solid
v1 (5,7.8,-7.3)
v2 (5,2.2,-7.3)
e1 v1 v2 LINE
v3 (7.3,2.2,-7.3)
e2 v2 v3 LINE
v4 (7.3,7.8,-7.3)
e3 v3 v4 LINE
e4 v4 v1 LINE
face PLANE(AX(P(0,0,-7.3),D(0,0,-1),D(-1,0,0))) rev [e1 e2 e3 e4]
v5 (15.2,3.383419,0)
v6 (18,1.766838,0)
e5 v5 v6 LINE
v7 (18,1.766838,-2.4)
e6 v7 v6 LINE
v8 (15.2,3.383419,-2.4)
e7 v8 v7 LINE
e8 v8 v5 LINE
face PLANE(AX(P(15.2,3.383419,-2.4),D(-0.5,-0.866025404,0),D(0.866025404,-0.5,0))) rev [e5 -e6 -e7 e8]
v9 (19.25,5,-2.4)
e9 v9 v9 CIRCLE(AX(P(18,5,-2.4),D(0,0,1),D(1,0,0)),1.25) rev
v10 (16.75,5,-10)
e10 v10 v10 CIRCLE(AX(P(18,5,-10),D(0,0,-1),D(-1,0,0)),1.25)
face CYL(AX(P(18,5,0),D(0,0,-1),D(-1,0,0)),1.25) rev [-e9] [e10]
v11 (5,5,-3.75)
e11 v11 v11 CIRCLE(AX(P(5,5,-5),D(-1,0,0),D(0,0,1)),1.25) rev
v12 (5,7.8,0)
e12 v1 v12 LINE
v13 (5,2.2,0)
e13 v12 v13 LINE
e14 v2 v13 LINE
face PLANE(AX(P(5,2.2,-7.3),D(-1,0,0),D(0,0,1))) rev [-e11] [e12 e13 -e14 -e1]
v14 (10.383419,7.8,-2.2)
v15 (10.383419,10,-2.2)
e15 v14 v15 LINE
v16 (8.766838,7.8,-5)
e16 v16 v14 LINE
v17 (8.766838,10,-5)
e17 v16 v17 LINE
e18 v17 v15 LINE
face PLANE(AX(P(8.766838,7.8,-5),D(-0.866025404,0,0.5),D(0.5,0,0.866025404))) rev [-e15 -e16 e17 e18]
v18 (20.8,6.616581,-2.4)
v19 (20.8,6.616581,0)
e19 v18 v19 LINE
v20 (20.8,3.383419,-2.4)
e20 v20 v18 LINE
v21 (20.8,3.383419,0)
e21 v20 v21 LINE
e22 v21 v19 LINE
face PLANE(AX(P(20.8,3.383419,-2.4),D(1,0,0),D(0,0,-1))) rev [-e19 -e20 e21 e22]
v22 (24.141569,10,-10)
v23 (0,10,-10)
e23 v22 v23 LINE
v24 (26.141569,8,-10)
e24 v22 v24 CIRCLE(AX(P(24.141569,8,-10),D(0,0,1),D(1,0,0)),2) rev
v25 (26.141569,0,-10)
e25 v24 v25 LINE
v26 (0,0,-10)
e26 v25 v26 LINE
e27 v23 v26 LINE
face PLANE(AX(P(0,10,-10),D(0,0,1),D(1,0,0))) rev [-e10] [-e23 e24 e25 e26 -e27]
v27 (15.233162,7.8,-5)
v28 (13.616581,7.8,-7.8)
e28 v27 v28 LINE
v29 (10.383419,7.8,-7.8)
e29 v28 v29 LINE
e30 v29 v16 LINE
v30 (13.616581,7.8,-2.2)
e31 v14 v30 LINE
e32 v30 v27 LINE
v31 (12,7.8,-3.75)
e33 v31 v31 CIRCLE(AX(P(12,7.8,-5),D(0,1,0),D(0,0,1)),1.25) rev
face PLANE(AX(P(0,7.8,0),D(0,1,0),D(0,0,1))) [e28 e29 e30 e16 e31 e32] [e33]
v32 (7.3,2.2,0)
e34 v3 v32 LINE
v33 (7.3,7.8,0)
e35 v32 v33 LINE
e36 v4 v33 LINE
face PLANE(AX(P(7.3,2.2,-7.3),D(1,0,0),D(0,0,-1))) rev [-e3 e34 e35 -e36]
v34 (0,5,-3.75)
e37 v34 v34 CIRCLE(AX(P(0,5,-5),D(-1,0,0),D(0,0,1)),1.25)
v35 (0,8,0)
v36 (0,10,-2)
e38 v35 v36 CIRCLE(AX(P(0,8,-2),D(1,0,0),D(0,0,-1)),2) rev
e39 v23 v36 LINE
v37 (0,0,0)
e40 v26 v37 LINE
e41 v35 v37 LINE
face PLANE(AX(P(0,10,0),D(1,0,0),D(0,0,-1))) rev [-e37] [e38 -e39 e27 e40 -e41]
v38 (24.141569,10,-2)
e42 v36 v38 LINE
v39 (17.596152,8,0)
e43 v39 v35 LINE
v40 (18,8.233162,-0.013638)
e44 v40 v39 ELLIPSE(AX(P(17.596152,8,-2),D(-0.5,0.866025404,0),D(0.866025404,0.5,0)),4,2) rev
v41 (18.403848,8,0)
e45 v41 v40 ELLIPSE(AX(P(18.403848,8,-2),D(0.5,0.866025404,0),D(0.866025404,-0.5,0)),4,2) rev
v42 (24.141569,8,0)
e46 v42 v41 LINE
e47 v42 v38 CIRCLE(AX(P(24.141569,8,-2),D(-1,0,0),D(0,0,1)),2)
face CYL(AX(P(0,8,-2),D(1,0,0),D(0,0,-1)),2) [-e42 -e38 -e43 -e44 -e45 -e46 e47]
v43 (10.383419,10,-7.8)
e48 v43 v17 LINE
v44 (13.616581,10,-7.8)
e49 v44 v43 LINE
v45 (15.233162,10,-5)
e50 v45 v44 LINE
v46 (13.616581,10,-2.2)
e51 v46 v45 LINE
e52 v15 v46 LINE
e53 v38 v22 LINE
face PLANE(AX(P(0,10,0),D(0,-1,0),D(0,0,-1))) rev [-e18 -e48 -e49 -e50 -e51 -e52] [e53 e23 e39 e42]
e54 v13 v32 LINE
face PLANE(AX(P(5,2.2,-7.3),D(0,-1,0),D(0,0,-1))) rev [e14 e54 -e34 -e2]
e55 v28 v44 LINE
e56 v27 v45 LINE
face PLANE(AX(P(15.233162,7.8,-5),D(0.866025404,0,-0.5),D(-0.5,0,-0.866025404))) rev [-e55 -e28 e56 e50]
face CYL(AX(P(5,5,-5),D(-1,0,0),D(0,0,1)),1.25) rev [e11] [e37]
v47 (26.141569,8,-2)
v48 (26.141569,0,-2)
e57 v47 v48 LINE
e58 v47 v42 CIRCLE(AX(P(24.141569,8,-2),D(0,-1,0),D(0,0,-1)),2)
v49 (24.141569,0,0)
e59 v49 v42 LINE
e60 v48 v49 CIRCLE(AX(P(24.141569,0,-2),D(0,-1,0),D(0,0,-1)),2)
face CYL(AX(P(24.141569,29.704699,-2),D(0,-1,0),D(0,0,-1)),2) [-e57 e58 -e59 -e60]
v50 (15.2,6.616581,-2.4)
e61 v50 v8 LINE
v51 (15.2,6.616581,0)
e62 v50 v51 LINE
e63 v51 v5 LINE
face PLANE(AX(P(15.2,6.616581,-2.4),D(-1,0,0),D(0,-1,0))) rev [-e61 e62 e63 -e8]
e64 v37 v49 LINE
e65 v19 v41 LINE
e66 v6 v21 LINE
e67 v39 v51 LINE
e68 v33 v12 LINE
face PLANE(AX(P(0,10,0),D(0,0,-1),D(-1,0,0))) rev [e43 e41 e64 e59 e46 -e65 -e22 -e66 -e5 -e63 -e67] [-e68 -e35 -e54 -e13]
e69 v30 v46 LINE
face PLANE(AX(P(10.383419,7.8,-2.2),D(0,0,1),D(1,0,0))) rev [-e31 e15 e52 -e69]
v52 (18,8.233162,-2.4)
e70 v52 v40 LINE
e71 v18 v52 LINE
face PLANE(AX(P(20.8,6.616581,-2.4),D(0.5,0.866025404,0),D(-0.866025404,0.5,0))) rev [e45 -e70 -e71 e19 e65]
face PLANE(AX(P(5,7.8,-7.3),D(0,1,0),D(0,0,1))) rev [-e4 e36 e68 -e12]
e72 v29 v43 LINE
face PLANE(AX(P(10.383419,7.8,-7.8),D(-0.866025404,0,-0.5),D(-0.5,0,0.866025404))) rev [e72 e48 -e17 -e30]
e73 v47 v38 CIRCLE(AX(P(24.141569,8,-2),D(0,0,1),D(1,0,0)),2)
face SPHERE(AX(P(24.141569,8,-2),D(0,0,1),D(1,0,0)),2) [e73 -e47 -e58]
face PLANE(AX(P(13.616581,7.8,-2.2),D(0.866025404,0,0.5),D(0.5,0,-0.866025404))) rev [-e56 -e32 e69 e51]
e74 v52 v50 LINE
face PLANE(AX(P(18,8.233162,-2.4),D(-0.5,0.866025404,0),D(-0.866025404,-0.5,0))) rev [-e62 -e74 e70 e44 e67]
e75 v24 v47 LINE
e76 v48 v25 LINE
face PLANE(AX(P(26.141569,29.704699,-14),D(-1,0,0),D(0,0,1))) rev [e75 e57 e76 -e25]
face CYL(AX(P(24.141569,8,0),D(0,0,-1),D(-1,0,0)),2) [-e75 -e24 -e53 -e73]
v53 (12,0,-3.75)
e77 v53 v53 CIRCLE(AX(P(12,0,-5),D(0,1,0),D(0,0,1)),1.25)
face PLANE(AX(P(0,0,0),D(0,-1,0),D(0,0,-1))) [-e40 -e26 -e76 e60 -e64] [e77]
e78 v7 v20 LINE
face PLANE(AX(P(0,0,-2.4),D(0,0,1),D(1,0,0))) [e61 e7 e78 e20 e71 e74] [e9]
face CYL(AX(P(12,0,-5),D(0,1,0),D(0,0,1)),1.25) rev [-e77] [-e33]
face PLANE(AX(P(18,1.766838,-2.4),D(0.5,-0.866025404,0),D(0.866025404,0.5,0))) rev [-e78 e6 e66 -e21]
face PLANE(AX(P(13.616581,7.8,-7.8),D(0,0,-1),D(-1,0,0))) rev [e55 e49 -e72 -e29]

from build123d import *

# Parameters (mm, degrees)
SKETCH1_W           = 74.5
SKETCH1_H           = 10
BOSS_EXTRUDE1_DEPTH = 10
SKETCH2_R           = 1.25
CUT_EXTRUDE1_DEPTH  = 10
SKETCH3_R           = 1.25
CUT_EXTRUDE2_DEPTH  = 10
SKETCH4_R           = 1.25
CUT_EXTRUDE3_DEPTH  = 5
CUT_EXTRUDE4_START  = -5
SKETCH5_R           = 1.25
CUT_EXTRUDE4_DEPTH  = 5
CUT_EXTRUDE5_DEPTH  = 2.2
CUT_EXTRUDE6_DEPTH  = 2.2
CUT_EXTRUDE8_DEPTH  = 2.2
SKETCH11_W          = 2.3
SKETCH11_H          = 5.6
CUT_EXTRUDE9_DEPTH  = 7.3
SKETCH12_W          = 92.79599186
SKETCH12_H          = 35.188487641
CUT_EXTRUDE10_DEPTH = 14
CUT_EXTRUDE11_DEPTH = 2.4
FILLET1_R           = 2
FILLET2_R           = 2


with BuildPart() as part:
    # Sketch1 → Boss-Extrude1 (new body)
    with BuildSketch(Plane(origin=(0, 0, 0), x_dir=(1, 0, 0), z_dir=(0, 1, 0))):
        with Locations((37.25, 5)):
            Rectangle(SKETCH1_W, SKETCH1_H)
    extrude(amount=BOSS_EXTRUDE1_DEPTH)

    # Sketch2 → Cut-Extrude1 (cut)
    with BuildSketch(Plane(origin=(0, 10, 0), x_dir=(1, 0, 0), z_dir=(0, 1, 0))):
        with Locations(Location((12, 5, 0), (0, 0, 270))):
            Circle(SKETCH2_R)
        with Locations(Location((62.5, 5, 0), (0, 0, 270))):
            Circle(SKETCH2_R)
    extrude(amount=-CUT_EXTRUDE1_DEPTH, mode=Mode.SUBTRACT)

    # Sketch3 → Cut-Extrude2 (cut)
    with BuildSketch(Plane(origin=(0, 0, -10), x_dir=(-1, 0, 0), z_dir=(0, 0, -1))):
        with Locations((-56.5, 5)):
            Circle(SKETCH3_R)
        with Locations((-18, 5)):
            Circle(SKETCH3_R)
    extrude(amount=-CUT_EXTRUDE2_DEPTH, mode=Mode.SUBTRACT)

    # Sketch4 → Cut-Extrude3 (cut)
    with BuildSketch(Plane(origin=(74.5, 0, 0), x_dir=(0, 0, -1), z_dir=(1, 0, 0))):
        with Locations((5, 5)):
            Circle(SKETCH4_R)
    extrude(amount=-CUT_EXTRUDE3_DEPTH, mode=Mode.SUBTRACT)

    # Sketch5 → Cut-Extrude4 (cut)
    with BuildSketch(Plane.ZY.offset(CUT_EXTRUDE4_START)):
        with Locations(Location((-5, 5, 0), (0, 0, 180))):
            Circle(SKETCH5_R)
    extrude(amount=CUT_EXTRUDE4_DEPTH, mode=Mode.SUBTRACT)

    # Sketch6 → Cut-Extrude5 (cut)
    with BuildSketch(Plane(origin=(0, 10, 0), x_dir=(1, 0, 0), z_dir=(0, 1, 0))):
        Polygon((13.616580754, 2.2), (15.233161507, 5), (13.616580754, 7.8), (10.383419246, 7.8), (8.766838493, 5), (10.383419246, 2.2), align=None)
    extrude(amount=-CUT_EXTRUDE5_DEPTH, mode=Mode.SUBTRACT)

    # Sketch7 → Cut-Extrude6 (cut)
    with BuildSketch(Plane(origin=(0, 10, 0), x_dir=(1, 0, 0), z_dir=(0, 1, 0))):
        Polygon((60.883419246, 7.8), (59.266838493, 5), (60.883419246, 2.2), (64.116580754, 2.2), (65.733161507, 5), (64.116580754, 7.8), align=None)
    extrude(amount=-CUT_EXTRUDE6_DEPTH, mode=Mode.SUBTRACT)

    # Sketch9 → Cut-Extrude8 (cut)
    with BuildSketch(Plane.XY):
        Polygon((58.116580754, 7.8), (54.883419246, 7.8), (53.266838493, 5), (54.883419246, 2.2), (58.116580754, 2.2), (59.733161507, 5), align=None)
    extrude(amount=-CUT_EXTRUDE8_DEPTH, mode=Mode.SUBTRACT)

    # Sketch11 → Cut-Extrude9 (cut)
    with BuildSketch(Plane.XY):
        with Locations((6.15, 5)):
            Rectangle(SKETCH11_W, SKETCH11_H)
        with Locations((68.35, 5)):
            Rectangle(SKETCH11_W, SKETCH11_H)
    extrude(amount=-CUT_EXTRUDE9_DEPTH, mode=Mode.SUBTRACT)

    # Sketch12 → Cut-Extrude10 (cut)
    with BuildSketch(Plane.XY):
        with Locations((72.539564665, 12.110455679)):
            Rectangle(SKETCH12_W, SKETCH12_H)
    extrude(amount=-CUT_EXTRUDE10_DEPTH, mode=Mode.SUBTRACT)

    # Sketch13 → Cut-Extrude11 (cut)
    with BuildSketch(Plane.XY):
        Polygon((20.8, 6.616580754), (18, 8.233161507), (15.2, 6.616580754), (15.2, 3.383419246), (18, 1.766838493), (20.8, 3.383419246), align=None)
    extrude(amount=-CUT_EXTRUDE11_DEPTH, mode=Mode.SUBTRACT)

    # Fillet1
    fillet1_edges = [part.edges().sort_by_distance(p)[0] for p in [
        (26.141568735, 5, 0),
    ]]
    fillet(fillet1_edges, radius=FILLET1_R)

    # Fillet2
    # the kernel refuses this fillet: 2 mm, written as the material it takes off along each edge
    with BuildSketch(Plane(origin=(26.141568735, 10, -15), x_dir=(-1, 0, 0), z_dir=(0, 0, 1))) as fillet2_piece_1:
        with BuildLine():
            CenterArc((FILLET2_R, FILLET2_R), FILLET2_R, 180, 90)
            Line((0, FILLET2_R), (0, 0))
            Line((0, 0), (FILLET2_R, 0))
        make_face()
    extrude(amount=13, mode=Mode.SUBTRACT)
    with BuildSketch(Plane(origin=(24.141568735, 10, -2), x_dir=(0, 0, 1), z_dir=(-1, 0, 0))) as fillet2_piece_2:
        with BuildLine():
            CenterArc((2 - FILLET2_R, -FILLET2_R), FILLET2_R, 0, 90)
            Line((2 - FILLET2_R, 0), (2, 0))
            Line((2, 0), (2, -FILLET2_R))
        make_face()
    revolve(axis=Axis((24.141568735, 10, -2), (0, 1, 0)), revolution_arc=90, mode=Mode.SUBTRACT)
    with BuildSketch(Plane(origin=(-5, 10, 0), x_dir=(0, -1, 0), z_dir=(1, 0, 0))) as fillet2_piece_3:
        with BuildLine():
            CenterArc((FILLET2_R, FILLET2_R), FILLET2_R, 180, 90)
            Line((0, FILLET2_R), (0, 0))
            Line((0, 0), (FILLET2_R, 0))
        make_face()
    extrude(amount=29.141568735, mode=Mode.SUBTRACT)


solid = part.part
